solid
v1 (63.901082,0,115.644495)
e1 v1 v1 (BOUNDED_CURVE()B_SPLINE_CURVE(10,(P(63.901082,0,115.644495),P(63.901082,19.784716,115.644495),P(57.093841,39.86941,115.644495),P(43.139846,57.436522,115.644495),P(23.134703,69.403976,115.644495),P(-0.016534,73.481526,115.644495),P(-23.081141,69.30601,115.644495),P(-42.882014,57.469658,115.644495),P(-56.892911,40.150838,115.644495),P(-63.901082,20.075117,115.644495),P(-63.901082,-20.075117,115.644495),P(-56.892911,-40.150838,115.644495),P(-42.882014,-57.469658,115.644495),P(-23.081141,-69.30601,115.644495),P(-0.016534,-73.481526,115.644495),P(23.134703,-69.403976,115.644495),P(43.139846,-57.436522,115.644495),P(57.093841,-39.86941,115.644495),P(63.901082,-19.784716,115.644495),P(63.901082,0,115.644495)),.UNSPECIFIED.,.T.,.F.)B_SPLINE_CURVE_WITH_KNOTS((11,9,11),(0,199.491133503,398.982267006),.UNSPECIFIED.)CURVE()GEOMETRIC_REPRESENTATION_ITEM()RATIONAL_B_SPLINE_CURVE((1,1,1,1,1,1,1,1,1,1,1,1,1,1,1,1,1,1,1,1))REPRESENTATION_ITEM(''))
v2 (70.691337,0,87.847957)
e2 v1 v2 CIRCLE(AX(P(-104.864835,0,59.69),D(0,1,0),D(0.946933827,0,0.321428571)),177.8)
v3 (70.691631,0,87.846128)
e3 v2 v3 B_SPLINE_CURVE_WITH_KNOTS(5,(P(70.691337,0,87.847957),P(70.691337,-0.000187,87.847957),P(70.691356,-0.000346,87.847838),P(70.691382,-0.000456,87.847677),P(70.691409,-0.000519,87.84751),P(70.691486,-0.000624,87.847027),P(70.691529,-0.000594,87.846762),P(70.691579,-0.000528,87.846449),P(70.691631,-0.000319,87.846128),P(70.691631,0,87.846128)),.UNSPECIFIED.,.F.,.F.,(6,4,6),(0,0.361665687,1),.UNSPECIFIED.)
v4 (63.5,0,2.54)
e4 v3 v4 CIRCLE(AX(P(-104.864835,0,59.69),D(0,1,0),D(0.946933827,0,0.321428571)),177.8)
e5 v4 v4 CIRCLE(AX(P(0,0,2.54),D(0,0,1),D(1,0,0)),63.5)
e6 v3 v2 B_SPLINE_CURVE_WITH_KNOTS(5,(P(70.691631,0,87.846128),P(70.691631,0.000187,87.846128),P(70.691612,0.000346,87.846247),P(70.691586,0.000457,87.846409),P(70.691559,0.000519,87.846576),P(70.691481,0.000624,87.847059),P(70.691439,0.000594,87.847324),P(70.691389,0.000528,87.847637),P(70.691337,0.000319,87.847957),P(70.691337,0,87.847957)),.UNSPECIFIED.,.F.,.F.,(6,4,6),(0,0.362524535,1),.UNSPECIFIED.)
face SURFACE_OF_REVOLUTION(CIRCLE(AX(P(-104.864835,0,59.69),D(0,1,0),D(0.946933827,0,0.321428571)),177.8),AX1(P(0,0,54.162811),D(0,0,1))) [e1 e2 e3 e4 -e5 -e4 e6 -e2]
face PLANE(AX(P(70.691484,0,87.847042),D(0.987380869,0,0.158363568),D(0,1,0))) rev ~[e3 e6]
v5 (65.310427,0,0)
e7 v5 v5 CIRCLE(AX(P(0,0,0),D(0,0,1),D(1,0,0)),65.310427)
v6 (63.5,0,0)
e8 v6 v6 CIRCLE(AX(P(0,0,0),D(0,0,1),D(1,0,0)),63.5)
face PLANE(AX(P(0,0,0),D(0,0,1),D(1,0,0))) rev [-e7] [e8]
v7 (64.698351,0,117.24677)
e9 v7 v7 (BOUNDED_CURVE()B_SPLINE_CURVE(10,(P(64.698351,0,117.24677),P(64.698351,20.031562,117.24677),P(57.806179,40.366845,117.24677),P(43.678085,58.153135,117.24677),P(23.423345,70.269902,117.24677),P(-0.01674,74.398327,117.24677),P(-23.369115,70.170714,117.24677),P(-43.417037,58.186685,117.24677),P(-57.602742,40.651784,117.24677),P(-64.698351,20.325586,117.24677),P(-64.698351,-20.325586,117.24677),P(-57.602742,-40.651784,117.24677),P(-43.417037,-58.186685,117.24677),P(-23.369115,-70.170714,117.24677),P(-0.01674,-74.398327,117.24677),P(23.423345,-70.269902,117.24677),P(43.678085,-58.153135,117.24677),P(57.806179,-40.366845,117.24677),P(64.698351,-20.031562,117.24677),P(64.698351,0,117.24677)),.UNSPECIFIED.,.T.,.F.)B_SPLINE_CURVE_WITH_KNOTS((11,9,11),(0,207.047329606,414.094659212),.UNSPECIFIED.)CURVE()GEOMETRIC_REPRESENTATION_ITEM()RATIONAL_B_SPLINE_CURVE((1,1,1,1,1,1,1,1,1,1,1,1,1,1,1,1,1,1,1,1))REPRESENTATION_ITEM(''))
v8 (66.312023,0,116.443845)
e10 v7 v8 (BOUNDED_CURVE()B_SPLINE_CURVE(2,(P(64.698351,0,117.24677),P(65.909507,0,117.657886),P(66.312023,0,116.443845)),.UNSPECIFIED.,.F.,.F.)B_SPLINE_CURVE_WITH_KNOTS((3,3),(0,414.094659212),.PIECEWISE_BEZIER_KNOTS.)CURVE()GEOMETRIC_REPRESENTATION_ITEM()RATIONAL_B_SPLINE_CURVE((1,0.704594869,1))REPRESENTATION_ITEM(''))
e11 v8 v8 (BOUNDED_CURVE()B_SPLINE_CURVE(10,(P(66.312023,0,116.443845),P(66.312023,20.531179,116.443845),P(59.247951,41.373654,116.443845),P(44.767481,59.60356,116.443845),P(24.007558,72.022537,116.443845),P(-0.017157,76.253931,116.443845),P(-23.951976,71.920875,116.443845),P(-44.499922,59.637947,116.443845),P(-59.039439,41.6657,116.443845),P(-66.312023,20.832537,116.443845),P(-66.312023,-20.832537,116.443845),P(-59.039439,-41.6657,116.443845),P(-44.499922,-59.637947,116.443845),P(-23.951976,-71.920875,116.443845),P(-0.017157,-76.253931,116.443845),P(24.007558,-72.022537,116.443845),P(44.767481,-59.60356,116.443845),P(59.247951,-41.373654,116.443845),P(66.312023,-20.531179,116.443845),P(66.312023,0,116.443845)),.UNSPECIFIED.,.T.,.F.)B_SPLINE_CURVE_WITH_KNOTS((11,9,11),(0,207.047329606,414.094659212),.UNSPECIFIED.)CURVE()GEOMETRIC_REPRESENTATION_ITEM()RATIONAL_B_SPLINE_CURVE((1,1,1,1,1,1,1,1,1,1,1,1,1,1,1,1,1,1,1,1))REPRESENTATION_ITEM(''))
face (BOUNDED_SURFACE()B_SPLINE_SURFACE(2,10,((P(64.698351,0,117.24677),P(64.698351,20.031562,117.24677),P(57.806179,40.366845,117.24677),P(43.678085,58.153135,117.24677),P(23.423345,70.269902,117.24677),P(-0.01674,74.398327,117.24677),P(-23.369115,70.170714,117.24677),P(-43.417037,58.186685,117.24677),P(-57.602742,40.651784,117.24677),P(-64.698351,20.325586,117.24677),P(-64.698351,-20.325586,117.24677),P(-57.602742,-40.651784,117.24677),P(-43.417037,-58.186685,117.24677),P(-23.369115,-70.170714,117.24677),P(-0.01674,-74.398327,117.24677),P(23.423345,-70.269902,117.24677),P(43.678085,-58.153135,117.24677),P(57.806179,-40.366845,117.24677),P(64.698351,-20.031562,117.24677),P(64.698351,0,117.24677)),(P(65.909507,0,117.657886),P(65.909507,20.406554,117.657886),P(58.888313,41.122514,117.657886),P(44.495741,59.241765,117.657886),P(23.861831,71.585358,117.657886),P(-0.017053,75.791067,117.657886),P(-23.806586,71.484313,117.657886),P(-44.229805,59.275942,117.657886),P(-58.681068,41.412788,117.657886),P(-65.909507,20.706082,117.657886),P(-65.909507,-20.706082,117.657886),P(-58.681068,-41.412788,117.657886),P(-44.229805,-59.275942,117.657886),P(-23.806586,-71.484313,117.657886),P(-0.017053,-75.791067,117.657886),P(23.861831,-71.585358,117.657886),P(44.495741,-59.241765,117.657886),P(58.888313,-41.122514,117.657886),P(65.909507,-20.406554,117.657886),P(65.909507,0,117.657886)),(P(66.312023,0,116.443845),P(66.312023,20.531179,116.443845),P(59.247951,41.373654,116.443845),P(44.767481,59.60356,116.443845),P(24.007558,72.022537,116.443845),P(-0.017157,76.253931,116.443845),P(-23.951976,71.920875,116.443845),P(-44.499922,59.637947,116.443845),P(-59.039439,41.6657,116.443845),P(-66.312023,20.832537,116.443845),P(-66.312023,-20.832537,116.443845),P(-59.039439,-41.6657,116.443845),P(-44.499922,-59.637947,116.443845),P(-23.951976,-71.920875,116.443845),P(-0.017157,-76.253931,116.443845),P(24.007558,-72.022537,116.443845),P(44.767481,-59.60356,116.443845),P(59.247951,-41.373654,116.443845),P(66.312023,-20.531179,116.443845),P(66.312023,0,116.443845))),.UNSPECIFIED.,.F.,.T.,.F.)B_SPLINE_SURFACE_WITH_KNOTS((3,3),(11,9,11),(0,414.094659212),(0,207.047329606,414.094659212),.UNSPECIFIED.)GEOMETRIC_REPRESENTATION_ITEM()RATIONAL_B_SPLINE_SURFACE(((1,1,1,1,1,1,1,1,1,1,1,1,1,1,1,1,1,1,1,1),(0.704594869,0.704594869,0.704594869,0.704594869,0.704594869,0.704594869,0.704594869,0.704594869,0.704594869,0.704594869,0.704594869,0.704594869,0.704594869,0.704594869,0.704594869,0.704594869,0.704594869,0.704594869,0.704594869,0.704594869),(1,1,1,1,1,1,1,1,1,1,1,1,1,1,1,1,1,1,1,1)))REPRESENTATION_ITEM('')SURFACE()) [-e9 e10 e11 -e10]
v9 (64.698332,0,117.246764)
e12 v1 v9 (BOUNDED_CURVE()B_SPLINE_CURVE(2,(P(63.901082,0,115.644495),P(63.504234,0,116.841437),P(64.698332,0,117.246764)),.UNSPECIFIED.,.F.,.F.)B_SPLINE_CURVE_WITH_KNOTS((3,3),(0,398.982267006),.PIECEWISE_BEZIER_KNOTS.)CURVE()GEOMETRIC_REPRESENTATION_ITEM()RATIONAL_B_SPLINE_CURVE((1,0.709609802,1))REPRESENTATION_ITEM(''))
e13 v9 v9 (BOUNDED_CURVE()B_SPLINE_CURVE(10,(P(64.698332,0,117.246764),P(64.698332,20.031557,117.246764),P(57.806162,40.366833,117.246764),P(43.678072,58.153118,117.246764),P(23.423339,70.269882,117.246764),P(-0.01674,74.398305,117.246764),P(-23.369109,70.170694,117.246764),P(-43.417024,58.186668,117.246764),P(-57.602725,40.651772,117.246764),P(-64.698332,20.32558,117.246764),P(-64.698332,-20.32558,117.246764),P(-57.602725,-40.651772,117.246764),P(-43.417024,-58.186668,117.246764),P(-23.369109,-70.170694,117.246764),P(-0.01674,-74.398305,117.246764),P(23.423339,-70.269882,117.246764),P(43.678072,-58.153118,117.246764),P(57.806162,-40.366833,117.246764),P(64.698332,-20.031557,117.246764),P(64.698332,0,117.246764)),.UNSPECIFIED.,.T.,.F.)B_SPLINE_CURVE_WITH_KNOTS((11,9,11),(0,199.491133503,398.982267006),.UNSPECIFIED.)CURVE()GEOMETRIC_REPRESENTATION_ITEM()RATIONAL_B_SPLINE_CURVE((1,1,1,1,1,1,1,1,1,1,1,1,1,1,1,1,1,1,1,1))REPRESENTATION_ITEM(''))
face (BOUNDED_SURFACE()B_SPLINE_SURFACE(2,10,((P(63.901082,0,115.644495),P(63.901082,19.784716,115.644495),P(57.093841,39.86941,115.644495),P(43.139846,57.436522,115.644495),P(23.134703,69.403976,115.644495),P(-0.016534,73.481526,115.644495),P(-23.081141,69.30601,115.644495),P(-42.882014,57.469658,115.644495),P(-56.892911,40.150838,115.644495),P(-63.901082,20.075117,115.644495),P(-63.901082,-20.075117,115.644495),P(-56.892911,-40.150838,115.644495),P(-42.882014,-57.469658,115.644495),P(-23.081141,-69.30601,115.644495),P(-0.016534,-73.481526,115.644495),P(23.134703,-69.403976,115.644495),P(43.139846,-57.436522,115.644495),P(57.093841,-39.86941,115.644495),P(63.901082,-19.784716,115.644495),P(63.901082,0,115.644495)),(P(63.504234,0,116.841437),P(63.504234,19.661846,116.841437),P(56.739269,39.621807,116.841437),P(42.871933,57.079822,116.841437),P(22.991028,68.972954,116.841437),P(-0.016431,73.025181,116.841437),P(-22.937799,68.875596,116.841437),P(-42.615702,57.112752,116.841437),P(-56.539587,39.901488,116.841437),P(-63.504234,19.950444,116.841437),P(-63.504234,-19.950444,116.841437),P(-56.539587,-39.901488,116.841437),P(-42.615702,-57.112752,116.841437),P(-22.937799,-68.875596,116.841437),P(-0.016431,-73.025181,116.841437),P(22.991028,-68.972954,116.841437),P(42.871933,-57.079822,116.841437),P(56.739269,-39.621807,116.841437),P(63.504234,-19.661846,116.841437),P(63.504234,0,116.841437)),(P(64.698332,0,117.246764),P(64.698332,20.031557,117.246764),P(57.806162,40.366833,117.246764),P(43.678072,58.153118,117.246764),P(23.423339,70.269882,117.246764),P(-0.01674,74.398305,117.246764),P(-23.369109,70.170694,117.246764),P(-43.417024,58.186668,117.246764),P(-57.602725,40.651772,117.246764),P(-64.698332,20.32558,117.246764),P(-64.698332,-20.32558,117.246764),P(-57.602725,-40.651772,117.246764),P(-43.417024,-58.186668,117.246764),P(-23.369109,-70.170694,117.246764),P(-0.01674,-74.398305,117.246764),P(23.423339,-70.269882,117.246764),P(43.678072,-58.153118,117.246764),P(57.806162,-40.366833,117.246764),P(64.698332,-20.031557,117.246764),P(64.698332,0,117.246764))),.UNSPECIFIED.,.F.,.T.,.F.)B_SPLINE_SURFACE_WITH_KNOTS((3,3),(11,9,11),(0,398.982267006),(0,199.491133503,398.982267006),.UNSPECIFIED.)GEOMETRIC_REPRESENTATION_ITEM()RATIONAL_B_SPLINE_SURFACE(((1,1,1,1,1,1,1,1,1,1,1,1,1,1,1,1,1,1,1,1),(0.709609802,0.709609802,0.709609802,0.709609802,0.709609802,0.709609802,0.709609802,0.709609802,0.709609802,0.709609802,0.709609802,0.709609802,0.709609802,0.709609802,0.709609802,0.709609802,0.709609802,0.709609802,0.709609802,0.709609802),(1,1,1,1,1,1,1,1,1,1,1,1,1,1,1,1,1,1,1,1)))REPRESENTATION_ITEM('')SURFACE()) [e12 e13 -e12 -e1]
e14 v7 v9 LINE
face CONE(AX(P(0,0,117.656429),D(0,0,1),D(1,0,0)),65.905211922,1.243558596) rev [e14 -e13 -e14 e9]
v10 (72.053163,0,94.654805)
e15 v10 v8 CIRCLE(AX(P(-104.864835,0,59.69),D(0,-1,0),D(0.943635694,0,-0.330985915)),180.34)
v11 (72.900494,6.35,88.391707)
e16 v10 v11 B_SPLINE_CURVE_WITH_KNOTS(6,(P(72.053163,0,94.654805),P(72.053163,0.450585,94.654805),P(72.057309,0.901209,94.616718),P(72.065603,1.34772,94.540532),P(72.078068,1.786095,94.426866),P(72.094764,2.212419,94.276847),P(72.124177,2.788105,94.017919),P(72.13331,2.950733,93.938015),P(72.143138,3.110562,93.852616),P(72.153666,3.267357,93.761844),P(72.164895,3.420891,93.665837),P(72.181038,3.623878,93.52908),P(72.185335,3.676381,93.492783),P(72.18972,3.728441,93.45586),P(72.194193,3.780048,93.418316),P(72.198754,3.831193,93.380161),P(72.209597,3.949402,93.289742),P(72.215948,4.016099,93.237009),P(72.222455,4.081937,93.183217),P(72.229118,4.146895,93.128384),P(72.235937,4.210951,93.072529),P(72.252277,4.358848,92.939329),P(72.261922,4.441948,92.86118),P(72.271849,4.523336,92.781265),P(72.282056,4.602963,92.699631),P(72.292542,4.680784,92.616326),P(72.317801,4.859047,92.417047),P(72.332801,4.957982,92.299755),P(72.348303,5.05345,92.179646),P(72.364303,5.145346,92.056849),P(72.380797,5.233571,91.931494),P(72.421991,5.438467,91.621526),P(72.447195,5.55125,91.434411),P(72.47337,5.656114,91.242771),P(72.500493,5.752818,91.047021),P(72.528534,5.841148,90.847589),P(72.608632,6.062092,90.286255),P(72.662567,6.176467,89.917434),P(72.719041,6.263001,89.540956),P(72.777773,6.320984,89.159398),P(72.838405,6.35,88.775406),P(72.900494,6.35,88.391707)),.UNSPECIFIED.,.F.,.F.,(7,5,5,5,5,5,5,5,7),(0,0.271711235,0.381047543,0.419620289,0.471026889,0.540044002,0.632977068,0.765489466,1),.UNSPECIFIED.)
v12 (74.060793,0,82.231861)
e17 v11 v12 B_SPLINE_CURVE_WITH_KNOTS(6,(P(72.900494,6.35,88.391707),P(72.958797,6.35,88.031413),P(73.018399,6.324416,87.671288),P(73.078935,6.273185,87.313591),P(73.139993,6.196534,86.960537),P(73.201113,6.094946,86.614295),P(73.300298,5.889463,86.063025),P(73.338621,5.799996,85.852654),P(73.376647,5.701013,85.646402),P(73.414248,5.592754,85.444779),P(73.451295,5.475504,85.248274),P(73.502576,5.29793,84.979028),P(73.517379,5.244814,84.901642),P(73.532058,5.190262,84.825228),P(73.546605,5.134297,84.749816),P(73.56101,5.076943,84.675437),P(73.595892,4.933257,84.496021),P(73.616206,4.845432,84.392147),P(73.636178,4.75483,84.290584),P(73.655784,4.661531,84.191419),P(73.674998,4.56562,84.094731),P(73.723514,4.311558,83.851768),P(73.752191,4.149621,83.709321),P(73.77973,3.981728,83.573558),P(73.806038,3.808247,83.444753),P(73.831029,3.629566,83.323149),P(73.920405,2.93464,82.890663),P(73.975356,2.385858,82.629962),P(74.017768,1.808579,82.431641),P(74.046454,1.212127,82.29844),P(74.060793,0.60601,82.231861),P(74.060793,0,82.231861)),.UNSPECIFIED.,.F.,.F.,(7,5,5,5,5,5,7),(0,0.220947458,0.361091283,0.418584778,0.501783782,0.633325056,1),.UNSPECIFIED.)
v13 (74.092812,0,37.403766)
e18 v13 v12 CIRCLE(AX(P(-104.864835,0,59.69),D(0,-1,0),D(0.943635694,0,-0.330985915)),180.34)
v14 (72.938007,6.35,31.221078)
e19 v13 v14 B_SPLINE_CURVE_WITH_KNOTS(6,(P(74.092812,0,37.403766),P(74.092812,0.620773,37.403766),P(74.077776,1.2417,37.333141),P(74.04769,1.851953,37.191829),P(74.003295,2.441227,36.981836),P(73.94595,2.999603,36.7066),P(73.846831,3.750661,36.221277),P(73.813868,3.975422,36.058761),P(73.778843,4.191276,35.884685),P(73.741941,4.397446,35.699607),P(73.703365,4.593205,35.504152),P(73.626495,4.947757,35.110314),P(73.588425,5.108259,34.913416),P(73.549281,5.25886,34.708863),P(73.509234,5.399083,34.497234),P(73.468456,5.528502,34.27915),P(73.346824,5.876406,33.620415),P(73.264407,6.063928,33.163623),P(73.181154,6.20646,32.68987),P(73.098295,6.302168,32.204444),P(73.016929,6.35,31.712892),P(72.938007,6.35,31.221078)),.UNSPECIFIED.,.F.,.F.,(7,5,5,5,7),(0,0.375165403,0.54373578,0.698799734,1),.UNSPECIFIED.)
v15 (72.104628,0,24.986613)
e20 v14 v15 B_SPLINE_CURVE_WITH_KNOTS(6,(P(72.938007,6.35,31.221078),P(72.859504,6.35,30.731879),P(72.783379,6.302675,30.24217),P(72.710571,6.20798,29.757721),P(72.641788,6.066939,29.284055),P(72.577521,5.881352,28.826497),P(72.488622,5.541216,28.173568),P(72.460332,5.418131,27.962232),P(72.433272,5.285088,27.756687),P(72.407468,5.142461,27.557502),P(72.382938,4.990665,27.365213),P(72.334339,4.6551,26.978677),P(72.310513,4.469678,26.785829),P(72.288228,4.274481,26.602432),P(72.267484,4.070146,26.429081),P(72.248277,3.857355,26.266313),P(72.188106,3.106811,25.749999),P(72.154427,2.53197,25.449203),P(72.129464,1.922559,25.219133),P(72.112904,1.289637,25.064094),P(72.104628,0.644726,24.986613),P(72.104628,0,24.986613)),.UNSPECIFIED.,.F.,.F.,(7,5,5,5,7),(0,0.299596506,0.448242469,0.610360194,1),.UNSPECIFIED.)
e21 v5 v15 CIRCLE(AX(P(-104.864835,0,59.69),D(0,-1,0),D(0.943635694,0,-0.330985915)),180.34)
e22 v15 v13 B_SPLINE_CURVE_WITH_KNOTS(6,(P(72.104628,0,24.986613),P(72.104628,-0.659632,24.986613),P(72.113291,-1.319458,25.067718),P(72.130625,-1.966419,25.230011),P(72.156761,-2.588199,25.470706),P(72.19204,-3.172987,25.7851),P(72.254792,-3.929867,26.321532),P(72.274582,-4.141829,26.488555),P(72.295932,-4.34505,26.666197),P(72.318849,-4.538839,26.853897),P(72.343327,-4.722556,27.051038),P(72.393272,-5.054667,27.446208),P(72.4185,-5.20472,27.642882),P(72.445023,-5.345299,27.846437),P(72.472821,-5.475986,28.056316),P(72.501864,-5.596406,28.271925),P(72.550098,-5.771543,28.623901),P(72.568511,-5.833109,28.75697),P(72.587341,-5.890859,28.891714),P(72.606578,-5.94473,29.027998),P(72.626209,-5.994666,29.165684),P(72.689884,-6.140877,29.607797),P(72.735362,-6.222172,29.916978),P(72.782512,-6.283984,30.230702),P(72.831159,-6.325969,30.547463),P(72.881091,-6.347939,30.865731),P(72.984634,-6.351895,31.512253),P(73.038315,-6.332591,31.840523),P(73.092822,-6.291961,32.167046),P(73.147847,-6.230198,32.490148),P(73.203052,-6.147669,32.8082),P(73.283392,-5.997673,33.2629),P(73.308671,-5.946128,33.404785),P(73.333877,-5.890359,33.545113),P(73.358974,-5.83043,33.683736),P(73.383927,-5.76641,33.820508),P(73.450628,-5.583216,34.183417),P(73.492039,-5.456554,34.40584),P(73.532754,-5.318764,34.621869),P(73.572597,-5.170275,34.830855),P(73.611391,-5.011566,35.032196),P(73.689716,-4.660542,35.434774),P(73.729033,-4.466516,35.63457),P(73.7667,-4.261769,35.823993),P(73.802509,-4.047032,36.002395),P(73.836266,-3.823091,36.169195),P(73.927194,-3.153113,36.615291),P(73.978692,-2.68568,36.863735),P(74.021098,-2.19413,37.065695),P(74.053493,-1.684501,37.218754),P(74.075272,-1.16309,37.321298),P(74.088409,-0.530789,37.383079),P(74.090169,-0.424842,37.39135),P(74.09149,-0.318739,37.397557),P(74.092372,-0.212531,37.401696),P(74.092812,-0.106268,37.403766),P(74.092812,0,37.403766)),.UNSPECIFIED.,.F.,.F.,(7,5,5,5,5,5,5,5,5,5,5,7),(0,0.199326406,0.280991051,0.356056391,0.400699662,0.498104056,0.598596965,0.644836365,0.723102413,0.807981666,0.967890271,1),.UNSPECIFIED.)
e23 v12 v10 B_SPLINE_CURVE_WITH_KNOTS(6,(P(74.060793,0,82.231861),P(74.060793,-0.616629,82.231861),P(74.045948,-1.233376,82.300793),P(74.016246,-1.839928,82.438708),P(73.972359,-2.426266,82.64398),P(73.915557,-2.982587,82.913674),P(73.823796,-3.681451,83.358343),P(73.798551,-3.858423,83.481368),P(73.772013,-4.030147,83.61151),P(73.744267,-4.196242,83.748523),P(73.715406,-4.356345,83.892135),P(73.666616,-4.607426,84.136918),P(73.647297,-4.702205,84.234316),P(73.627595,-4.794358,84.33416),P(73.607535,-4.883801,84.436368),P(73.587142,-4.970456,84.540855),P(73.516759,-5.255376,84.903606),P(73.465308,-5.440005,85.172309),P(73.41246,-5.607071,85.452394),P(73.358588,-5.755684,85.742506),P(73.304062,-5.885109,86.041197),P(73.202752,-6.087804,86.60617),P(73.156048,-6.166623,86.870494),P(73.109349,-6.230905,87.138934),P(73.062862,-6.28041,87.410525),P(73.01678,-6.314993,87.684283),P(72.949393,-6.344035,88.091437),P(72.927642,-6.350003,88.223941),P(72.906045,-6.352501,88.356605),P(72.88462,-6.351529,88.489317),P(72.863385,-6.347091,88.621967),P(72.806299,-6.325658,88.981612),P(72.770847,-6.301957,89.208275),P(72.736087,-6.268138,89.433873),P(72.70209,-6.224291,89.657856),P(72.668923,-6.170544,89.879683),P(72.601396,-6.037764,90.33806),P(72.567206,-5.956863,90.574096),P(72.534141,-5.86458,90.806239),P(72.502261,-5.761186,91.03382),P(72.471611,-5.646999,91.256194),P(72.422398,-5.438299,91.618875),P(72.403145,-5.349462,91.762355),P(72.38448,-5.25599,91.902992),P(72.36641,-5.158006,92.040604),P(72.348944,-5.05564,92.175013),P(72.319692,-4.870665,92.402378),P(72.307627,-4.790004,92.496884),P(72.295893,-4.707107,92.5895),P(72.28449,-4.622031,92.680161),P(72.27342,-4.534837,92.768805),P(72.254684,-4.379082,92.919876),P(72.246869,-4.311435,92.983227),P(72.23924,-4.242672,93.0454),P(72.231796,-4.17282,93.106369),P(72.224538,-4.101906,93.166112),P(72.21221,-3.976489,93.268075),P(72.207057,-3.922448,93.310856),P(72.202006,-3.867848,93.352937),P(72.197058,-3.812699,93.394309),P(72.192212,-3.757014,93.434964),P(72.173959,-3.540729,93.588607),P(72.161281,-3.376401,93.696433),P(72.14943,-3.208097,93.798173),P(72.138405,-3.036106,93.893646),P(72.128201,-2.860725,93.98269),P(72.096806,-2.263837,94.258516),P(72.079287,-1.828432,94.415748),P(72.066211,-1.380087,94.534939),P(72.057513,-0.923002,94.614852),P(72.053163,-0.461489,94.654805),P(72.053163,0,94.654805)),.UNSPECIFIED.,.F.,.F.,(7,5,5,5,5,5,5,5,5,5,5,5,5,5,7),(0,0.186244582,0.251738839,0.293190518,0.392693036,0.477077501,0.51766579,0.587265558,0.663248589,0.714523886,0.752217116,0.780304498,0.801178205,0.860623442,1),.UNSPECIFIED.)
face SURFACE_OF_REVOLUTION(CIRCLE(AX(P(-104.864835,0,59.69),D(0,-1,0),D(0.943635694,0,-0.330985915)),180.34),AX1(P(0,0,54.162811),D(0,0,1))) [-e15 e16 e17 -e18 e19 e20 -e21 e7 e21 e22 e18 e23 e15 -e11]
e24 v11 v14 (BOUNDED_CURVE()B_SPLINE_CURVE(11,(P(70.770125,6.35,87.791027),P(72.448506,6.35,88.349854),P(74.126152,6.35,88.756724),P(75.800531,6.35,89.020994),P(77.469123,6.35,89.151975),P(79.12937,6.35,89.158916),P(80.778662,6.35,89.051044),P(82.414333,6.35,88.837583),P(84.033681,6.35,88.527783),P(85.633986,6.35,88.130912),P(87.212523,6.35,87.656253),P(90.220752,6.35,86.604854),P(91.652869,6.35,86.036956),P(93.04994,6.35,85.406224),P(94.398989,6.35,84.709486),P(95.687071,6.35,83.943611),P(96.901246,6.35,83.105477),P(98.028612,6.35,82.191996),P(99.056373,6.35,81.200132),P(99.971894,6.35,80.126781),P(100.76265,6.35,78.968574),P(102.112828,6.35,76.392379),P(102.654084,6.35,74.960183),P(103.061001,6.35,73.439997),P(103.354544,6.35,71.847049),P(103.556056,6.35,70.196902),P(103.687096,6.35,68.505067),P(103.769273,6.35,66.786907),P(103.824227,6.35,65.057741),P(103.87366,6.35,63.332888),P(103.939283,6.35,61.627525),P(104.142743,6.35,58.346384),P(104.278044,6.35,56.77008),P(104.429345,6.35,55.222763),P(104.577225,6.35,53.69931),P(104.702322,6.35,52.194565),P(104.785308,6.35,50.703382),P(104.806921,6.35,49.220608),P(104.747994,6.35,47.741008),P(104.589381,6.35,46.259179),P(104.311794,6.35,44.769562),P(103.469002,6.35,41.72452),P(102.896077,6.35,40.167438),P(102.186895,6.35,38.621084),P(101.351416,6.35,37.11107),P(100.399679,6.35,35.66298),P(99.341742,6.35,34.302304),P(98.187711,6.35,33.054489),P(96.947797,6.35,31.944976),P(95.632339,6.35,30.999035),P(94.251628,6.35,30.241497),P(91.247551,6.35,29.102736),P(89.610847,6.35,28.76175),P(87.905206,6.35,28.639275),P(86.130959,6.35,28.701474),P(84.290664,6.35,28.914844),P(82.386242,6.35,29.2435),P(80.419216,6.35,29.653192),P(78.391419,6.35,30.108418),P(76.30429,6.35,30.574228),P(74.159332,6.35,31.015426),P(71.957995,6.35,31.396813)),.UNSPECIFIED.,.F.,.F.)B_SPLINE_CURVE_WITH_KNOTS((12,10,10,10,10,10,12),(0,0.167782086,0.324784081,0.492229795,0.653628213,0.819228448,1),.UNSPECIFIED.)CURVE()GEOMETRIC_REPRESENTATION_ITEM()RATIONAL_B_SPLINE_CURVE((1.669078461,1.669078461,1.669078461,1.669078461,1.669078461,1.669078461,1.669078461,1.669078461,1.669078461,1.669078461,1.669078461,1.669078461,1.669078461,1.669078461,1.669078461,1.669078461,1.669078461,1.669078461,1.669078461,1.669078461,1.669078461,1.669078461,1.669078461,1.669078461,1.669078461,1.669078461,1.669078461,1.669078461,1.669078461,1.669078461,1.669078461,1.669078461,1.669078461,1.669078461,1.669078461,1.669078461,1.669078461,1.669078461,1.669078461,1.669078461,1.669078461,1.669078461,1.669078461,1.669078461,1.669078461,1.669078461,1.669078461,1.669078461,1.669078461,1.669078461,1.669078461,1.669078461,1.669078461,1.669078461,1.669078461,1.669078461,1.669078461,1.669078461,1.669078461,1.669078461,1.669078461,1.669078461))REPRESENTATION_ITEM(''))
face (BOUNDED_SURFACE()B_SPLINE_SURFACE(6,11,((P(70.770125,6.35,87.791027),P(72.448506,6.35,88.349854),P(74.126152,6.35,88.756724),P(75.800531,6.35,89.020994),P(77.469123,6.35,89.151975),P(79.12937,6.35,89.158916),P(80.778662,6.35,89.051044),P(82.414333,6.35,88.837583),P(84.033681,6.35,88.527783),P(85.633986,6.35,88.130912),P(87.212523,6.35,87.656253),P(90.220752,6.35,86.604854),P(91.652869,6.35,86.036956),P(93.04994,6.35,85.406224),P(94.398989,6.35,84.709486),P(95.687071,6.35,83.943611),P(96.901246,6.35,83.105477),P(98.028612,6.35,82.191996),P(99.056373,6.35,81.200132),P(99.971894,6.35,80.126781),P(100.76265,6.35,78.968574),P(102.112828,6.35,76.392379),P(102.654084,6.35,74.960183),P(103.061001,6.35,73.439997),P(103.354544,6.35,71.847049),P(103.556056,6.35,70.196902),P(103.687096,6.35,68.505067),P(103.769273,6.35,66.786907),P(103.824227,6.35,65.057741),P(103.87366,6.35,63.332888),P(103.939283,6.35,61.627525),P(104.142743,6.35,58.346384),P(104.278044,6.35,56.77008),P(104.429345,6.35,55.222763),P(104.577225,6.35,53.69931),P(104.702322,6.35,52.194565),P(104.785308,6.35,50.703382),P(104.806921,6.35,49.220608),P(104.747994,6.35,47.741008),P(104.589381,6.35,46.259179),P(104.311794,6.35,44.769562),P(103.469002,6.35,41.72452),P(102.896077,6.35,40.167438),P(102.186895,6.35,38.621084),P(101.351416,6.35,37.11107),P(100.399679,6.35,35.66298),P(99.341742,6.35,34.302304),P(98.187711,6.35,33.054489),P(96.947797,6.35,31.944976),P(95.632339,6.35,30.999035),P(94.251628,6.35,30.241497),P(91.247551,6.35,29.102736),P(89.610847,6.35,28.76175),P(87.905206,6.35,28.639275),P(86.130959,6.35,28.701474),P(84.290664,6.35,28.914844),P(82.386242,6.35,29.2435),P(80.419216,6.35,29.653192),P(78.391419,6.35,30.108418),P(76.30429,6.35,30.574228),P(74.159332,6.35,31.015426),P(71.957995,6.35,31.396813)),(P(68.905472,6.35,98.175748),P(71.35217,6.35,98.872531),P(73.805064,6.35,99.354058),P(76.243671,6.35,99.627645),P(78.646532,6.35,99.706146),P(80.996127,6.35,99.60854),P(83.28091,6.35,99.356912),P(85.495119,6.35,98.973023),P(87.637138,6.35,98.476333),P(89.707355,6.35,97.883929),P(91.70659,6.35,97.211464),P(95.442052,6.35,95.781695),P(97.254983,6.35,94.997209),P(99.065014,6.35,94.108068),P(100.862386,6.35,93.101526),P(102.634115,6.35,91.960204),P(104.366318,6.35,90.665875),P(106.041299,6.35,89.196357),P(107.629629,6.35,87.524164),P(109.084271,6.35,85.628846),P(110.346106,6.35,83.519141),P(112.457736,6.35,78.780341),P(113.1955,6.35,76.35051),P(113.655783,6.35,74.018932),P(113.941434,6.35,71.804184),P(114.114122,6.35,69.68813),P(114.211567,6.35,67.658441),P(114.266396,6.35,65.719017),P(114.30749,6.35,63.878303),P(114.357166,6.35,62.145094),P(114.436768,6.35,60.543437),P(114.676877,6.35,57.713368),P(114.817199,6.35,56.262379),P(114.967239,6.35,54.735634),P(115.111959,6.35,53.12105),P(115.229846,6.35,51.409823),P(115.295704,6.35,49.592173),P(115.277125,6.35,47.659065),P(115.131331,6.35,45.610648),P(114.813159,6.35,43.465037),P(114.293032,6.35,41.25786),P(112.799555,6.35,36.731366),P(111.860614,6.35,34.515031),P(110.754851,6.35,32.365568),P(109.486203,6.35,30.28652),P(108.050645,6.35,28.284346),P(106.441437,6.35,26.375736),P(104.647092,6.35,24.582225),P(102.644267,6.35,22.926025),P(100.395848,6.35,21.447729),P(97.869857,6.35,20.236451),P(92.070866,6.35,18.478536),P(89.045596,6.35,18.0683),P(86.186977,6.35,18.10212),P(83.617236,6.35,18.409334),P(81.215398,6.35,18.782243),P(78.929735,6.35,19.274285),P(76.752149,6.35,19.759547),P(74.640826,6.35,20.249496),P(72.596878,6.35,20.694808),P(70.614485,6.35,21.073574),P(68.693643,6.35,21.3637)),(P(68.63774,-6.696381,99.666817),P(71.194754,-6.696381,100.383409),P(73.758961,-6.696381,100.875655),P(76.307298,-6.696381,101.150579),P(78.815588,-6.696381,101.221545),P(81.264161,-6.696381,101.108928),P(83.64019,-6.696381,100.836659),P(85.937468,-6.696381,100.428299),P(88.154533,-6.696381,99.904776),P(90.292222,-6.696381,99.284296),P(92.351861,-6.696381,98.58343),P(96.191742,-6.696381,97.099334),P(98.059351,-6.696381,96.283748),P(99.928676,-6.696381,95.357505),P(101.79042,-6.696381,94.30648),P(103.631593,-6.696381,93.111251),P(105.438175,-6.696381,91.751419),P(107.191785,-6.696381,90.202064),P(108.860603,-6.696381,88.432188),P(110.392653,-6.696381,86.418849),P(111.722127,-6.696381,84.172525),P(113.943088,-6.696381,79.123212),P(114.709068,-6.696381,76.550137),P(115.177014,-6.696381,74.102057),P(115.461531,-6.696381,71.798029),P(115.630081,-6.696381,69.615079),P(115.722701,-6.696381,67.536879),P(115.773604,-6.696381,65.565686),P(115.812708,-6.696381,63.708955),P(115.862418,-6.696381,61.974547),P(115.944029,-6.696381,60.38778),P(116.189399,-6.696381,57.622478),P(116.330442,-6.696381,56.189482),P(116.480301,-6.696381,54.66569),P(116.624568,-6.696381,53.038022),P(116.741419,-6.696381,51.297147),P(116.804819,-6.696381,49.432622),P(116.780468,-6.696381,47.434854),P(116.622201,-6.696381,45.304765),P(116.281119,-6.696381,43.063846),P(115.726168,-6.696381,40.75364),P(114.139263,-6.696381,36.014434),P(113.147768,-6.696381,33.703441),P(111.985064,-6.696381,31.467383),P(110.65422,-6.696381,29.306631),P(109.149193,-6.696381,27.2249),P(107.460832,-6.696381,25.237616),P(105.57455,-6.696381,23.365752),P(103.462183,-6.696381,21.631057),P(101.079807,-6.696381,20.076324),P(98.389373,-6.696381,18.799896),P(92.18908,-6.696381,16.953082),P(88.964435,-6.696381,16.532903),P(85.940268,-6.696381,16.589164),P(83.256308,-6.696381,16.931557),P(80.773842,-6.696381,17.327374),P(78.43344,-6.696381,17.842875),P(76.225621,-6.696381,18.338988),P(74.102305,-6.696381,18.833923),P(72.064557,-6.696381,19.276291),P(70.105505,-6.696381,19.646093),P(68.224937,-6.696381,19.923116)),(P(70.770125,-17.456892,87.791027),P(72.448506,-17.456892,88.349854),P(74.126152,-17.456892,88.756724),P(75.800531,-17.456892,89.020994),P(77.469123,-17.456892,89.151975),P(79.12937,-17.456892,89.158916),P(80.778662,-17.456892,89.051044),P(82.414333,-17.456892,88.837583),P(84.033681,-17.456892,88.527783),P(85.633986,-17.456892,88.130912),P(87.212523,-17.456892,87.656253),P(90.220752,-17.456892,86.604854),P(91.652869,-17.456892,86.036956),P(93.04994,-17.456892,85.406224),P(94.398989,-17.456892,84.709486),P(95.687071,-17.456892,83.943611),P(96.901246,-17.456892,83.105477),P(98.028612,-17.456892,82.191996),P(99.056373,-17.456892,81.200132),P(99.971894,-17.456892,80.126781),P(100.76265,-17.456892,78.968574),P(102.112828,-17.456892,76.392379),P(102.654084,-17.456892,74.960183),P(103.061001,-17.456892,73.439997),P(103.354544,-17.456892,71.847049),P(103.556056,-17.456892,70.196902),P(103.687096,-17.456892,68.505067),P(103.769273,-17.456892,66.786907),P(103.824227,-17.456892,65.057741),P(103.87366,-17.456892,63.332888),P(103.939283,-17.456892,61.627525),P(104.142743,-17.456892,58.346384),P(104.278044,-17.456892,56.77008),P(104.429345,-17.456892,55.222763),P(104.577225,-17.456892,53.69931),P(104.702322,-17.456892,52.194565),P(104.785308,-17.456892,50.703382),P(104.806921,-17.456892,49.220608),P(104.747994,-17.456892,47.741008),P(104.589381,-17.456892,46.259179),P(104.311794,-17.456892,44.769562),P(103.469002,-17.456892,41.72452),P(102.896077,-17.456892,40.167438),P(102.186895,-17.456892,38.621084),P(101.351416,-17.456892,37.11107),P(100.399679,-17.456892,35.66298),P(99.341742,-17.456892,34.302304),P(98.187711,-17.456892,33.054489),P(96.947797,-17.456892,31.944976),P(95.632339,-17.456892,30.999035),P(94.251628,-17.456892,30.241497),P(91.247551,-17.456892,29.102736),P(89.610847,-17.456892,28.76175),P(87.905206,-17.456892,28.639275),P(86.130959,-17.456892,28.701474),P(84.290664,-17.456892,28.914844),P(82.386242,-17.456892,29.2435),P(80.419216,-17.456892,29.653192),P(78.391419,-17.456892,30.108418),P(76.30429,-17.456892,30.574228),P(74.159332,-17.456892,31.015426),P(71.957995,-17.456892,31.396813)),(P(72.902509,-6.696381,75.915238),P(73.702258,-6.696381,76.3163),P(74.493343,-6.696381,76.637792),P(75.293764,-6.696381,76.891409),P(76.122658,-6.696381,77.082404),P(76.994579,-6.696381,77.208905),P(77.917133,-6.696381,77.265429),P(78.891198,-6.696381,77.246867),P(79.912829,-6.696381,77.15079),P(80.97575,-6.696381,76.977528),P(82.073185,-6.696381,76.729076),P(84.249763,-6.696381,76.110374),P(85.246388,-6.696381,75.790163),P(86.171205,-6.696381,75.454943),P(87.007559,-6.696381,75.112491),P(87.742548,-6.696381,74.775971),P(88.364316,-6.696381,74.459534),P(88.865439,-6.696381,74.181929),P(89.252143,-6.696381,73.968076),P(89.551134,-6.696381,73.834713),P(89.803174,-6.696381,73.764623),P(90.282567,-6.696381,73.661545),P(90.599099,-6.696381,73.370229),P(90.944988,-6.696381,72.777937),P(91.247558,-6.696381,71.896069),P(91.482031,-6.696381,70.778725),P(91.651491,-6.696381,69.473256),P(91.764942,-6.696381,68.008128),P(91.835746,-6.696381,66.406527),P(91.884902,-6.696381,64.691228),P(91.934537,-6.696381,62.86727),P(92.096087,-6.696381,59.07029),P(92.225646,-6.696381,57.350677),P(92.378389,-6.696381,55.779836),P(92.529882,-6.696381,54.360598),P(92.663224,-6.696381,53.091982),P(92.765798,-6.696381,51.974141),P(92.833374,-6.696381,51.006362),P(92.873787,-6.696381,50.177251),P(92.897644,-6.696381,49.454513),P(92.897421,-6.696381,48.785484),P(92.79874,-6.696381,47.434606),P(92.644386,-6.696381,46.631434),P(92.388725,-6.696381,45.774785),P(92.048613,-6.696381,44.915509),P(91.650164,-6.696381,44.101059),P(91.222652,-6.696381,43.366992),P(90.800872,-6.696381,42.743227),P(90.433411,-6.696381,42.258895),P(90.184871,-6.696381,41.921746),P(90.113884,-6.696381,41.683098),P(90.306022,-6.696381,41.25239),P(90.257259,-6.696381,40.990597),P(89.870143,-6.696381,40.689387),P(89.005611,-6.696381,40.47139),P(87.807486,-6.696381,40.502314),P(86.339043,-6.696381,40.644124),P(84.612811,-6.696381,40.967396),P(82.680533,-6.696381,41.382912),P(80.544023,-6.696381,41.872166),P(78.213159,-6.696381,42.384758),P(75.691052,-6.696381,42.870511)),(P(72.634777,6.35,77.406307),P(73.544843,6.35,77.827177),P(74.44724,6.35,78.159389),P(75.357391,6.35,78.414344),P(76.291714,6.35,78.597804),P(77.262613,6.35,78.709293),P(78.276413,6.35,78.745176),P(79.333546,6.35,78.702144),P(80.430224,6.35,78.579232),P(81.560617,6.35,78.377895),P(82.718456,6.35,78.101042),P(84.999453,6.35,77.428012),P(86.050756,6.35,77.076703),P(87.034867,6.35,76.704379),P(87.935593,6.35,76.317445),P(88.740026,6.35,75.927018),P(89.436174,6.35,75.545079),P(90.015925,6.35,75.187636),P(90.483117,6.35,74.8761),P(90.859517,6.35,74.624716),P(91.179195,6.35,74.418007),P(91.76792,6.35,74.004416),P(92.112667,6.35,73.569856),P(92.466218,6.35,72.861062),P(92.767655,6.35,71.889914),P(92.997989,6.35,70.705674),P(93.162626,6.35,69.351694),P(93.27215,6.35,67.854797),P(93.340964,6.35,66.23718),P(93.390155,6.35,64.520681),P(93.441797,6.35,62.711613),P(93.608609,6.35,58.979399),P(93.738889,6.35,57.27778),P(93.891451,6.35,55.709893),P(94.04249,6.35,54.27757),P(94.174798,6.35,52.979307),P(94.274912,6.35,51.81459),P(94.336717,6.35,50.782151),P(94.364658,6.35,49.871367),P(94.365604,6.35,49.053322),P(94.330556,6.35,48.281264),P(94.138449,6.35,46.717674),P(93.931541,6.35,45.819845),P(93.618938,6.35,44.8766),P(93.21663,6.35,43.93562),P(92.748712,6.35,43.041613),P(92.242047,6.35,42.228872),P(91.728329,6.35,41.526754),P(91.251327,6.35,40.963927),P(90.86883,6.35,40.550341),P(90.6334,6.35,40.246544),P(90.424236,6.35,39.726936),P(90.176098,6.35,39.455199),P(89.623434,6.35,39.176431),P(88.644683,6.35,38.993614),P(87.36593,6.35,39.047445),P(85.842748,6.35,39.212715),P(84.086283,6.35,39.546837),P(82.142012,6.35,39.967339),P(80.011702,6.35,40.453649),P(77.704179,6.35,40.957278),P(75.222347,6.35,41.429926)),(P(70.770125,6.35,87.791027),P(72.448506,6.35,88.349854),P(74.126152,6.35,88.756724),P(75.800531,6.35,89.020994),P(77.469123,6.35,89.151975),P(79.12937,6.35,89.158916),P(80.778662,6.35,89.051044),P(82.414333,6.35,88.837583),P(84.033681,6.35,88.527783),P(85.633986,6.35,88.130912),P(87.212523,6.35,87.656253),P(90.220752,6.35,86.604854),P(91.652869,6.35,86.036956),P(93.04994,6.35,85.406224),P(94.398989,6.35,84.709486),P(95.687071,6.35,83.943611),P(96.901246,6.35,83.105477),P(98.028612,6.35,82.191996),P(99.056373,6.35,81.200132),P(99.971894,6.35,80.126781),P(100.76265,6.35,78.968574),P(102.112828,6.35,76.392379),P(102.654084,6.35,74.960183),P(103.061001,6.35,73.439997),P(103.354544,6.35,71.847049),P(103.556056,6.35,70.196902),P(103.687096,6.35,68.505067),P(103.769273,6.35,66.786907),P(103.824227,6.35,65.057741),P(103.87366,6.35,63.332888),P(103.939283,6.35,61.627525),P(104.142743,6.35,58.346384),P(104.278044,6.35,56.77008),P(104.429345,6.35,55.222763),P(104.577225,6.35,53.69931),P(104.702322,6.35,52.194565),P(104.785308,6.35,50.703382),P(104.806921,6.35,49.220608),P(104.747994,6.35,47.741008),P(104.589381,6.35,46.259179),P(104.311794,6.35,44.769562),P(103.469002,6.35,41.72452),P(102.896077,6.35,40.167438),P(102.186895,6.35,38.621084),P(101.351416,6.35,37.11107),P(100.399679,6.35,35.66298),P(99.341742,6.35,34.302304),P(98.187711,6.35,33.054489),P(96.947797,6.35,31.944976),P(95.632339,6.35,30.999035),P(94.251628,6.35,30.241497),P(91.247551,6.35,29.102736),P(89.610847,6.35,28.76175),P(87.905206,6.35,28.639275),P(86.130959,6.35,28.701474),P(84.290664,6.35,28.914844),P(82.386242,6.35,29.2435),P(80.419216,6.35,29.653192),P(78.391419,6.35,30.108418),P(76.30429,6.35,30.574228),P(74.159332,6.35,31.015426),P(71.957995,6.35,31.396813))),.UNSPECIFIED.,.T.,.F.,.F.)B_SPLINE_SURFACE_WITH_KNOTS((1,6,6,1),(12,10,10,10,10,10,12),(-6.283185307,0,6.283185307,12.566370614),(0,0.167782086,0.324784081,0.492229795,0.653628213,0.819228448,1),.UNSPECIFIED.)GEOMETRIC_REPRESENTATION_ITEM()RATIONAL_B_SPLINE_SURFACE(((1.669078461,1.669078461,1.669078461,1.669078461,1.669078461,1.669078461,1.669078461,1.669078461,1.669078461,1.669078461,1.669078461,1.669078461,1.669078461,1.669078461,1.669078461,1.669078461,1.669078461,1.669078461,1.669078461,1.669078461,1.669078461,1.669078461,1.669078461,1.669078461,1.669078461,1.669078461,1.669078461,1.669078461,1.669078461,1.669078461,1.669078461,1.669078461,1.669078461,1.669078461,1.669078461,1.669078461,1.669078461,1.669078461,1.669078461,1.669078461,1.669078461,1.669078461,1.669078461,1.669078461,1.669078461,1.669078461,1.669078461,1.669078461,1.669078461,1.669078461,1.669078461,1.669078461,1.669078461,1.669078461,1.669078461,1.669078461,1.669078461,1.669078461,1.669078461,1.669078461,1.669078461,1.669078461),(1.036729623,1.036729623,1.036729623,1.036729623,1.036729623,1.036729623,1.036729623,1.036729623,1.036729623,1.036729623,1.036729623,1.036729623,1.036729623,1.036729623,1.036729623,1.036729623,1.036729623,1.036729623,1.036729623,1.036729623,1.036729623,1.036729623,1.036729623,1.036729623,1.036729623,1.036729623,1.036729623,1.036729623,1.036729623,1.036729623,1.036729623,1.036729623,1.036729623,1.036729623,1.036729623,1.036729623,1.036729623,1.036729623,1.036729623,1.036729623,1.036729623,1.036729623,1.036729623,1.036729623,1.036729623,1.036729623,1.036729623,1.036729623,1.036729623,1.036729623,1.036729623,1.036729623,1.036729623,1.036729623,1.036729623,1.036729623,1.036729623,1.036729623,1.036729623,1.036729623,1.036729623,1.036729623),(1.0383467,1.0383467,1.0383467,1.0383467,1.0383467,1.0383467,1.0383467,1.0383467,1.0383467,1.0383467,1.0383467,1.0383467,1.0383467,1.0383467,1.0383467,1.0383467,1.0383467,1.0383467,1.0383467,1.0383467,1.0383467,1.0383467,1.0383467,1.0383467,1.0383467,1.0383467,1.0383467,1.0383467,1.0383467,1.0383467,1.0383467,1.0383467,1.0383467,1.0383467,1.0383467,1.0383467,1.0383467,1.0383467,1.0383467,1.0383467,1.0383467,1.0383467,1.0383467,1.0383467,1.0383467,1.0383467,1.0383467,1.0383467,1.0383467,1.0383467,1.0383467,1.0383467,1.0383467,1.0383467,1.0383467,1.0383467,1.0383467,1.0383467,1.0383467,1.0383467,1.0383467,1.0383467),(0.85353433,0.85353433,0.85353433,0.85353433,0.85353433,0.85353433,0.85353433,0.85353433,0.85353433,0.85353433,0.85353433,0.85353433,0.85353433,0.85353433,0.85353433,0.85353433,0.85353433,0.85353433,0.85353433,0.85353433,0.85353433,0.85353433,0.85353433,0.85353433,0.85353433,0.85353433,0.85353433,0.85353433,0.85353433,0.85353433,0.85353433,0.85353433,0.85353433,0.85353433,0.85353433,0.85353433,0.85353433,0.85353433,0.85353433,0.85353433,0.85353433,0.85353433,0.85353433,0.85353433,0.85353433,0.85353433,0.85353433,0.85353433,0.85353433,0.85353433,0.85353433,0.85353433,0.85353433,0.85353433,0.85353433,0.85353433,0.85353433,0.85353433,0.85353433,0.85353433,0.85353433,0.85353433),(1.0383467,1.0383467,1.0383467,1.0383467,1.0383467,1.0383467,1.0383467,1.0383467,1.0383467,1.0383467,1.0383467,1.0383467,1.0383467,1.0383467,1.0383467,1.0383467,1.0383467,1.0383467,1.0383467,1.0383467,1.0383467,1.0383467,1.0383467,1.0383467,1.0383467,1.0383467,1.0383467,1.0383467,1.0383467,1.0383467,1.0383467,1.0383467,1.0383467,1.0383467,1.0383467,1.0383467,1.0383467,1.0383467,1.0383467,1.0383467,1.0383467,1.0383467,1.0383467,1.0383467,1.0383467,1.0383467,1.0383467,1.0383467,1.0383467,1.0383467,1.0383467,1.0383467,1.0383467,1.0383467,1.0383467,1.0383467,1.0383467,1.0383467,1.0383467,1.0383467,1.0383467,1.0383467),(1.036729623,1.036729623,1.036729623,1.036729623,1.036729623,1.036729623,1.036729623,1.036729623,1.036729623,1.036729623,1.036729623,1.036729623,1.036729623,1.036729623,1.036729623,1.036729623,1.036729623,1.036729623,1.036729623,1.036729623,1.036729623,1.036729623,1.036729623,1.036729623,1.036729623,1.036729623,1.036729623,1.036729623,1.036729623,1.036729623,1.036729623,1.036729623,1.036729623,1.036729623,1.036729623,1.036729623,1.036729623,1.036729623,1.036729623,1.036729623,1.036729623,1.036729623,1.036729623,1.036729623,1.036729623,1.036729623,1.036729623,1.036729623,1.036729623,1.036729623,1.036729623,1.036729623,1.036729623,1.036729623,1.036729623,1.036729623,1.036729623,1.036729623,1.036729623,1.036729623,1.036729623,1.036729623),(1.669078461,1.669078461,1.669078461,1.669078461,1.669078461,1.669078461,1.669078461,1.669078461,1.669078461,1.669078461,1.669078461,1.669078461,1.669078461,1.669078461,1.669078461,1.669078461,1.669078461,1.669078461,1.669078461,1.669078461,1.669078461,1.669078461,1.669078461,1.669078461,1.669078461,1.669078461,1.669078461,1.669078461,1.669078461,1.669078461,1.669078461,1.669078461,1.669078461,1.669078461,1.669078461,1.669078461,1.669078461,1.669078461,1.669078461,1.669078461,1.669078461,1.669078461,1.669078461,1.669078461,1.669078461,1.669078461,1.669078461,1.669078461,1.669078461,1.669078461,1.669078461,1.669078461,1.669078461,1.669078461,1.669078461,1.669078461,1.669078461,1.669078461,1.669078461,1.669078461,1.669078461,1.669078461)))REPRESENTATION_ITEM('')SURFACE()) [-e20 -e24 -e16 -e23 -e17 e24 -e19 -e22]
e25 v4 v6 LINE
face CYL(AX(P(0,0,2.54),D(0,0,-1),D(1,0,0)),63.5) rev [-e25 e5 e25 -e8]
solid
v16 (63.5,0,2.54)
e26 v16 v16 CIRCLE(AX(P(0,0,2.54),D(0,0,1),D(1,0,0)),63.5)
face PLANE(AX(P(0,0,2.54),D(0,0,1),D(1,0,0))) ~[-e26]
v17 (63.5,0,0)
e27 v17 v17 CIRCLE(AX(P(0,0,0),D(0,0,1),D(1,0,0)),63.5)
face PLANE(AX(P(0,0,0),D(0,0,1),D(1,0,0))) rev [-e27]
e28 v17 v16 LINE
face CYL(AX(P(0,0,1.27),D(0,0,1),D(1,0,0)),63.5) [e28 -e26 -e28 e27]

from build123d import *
from build123d import SkipClean  # not in build123d's __all__

# Parameters (mm, degrees)
F7_R      = 6.35
F9_DEPTH  = 0.508
F9_FACE_R = 6.35
F0_W      = 63.5
F0_H      = 2.54
F13_R     = 1.26999


# Not quite as in the source:
# - a fillet or chamfer is up to 0.001 mm smaller than in the source, because OpenCascade refuses the exact size


with BuildPart() as f9:
    # F7 (on line) → F9 (new body)
    with BuildSketch(Plane(origin=(82.6548274491, 0, 13.2568026813), x_dir=(0, 1, 0), z_dir=(0.987380869, 0, 0.1583635676))):
        with Locations((0, 75.5435333763)):
            Circle(F7_R)
    extrude(amount=F9_DEPTH)

    # F10: sweep along a path in F8
    with BuildLine(Plane.XZ) as f10_path:
        add(Plane.XZ * Edge.make_bspline(
            [(70.7532390952, 87.8850668669), (76.9328166344, 89.9386797191), (88.8710249029, 88.5008376395), (104.370995623, 79.193138841), (103.4524982391, 59.5380260798), (106.5599850718, 43.3373405944), (93.4955967823, 25.126711502), (79.9906905785, 29.9105676106), (71.9284340739, 31.3059575856)],
            knots=[0, 0, 0, 0, 0.1677820863, 0.3247840807, 0.4922297949, 0.6536282129, 0.8192284485, 1, 1, 1, 1], degree=3))
    # F9_face (on face) → F10 (sweep)
    with BuildSketch(Plane(origin=(71.1930734784, 0, 87.9274910061), x_dir=(0, 1, 0), z_dir=(0.987380869, 0, 0.1583635676))):
        Circle(F9_FACE_R)
    with SkipClean():  # cleaning this boolean's faces spoils the solid; the shape is the same uncleaned
        sweep(path=f10_path.line)

    # F1 (on Front) → F12 (revolve)
    with BuildSketch(Plane.XZ):
        with BuildLine():
            ThreePointArc((63.5, 116.84), (72.9351654888, 59.69), (63.5, 2.54))
            Line((63.5, 2.54), (63.5, 0))
            Line((63.5, 0), (65.3104266168, 0))
            ThreePointArc((65.3104266168, 0), (75.4728611683, 58.7783438109), (65.9052119216, 117.6564285714))
            Line((65.9052119216, 117.6564285714), (63.5, 116.84))
        make_face()
    revolve(axis=Axis((0, 0, 54.1628114879), (0, 0, 1)))

    # F13 (radius 1.27 in the source; OpenCascade refuses exactly that, so slightly less here)
    f13_edges = [f9.edges().sort_by_distance(p)[0] for p in [
        (-65.905212, 0, 117.656429),
        (-63.5, 0, 116.84),
    ]]
    fillet(f13_edges, radius=F13_R)


with BuildPart() as f11:
    # F0 (on Front) → F11 (revolve)
    with BuildSketch(Plane.XZ):
        with Locations((31.75, 1.27)):
            Rectangle(F0_W, F0_H)
    revolve(axis=Axis((0, 0, 54.1628114879), (0, 0, 1)))


solid = Compound([f9.part, f11.part])
